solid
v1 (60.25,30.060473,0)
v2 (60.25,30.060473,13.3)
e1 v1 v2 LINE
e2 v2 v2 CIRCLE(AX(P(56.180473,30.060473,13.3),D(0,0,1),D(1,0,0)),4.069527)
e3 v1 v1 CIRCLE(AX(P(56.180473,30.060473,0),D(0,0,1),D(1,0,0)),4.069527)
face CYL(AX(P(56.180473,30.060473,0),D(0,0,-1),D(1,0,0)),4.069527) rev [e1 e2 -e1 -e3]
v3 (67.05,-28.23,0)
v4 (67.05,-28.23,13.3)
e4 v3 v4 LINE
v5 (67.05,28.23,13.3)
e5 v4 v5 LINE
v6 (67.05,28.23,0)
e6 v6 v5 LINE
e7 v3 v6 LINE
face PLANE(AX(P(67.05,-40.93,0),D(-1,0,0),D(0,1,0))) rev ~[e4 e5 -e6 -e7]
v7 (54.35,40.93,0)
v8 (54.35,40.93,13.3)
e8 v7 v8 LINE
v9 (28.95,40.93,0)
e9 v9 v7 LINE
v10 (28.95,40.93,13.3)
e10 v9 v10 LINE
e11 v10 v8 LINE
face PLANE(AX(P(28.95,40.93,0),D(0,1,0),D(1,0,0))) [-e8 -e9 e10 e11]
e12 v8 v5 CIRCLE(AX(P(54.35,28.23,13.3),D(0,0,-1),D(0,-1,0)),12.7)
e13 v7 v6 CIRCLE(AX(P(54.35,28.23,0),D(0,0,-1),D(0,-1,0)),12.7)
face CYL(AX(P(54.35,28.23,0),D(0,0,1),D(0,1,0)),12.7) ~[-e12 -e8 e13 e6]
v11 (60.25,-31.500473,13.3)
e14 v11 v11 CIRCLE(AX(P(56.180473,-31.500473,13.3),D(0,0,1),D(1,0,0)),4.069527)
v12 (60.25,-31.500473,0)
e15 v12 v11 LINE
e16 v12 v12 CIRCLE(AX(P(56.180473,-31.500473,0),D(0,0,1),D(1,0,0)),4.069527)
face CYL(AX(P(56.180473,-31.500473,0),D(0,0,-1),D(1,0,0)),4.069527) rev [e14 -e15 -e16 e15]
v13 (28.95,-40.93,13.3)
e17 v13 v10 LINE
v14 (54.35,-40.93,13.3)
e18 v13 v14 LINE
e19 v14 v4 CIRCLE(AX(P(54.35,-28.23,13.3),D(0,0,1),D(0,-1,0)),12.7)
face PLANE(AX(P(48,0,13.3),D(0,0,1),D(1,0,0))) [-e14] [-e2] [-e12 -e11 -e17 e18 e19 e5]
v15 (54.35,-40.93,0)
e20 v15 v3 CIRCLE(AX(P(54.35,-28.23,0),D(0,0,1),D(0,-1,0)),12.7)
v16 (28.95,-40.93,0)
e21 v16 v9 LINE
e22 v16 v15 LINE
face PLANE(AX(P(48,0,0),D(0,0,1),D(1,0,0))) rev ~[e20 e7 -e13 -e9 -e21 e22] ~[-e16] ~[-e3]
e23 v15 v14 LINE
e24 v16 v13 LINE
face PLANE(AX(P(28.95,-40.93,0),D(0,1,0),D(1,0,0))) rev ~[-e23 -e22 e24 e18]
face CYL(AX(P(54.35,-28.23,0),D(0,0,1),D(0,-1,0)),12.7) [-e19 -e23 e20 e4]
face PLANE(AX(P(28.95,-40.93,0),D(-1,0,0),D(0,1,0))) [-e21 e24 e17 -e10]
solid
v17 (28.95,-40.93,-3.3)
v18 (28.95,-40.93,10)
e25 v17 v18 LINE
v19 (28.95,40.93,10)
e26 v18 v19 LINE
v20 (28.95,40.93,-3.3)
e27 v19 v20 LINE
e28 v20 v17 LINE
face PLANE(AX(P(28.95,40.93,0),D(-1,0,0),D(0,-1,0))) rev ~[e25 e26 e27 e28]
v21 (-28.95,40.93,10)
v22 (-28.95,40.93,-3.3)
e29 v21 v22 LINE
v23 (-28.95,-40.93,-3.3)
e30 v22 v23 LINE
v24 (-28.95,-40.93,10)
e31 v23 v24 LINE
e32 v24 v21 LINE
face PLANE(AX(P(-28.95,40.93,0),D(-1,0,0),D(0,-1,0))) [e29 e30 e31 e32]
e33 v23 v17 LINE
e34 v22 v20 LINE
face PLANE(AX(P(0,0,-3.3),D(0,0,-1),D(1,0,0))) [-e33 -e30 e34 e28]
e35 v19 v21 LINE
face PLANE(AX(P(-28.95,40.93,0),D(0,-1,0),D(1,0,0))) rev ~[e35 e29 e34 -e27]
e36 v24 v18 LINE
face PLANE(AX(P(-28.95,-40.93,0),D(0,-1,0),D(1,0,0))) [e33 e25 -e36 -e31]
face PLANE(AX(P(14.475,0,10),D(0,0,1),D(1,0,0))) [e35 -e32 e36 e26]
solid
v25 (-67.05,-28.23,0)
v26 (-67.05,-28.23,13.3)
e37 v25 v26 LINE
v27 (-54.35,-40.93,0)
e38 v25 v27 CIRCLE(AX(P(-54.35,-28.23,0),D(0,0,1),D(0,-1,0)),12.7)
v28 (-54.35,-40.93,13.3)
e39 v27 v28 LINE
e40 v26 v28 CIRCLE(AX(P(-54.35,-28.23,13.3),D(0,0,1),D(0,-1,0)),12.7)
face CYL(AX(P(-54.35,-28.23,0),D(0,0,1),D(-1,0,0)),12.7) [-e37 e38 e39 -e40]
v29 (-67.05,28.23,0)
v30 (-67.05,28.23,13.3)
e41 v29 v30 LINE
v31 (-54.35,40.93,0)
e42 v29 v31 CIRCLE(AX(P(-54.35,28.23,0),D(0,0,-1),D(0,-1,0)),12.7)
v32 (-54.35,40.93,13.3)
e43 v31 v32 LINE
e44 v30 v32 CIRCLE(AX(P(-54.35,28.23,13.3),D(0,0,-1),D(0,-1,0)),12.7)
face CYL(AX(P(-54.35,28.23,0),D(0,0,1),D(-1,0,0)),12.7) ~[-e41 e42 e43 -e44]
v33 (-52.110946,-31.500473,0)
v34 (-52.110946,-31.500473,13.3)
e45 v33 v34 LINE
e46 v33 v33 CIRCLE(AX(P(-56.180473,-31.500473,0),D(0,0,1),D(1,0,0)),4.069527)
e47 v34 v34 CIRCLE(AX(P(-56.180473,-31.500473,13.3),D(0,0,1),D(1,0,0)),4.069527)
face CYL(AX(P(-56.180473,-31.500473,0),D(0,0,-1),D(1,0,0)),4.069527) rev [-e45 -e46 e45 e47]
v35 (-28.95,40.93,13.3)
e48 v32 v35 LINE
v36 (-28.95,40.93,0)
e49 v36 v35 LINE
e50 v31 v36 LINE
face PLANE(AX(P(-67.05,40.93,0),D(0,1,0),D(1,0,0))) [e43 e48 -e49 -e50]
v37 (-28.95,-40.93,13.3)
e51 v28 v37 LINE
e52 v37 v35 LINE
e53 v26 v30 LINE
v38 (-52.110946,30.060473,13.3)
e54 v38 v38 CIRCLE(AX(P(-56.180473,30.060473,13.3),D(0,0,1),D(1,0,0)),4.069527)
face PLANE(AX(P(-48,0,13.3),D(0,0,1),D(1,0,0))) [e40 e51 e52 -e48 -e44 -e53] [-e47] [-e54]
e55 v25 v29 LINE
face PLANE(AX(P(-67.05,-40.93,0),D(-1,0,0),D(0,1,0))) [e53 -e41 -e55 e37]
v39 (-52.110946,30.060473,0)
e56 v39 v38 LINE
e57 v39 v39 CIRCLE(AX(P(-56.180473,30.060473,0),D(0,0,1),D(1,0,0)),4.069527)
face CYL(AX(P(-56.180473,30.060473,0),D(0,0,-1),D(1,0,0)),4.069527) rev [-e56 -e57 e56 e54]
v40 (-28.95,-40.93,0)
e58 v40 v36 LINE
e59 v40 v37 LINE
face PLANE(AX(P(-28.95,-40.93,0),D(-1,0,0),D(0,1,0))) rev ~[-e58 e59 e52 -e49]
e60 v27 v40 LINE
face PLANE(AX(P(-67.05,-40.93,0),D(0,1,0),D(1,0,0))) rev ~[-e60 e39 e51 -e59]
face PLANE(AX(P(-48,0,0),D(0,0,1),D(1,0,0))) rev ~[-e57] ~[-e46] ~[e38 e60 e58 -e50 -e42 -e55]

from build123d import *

# Parameters (mm, degrees)
F0_W     = 38.1
F0_H     = 81.86
F0_R     = 4.0695268365
F1_DEPTH = 13.3
F0_W_2   = 28.95
F2_DEPTH = 10
F3_W     = 57.9
F3_H     = 81.86
F4_DEPTH = 3.3
F5_R     = 12.7
F5_2_R   = 12.7


with BuildPart() as f1:
    # F0 (on Top) → F1 (new body)
    with BuildSketch(Plane.XY):
        with Locations((-48, 0)):
            Rectangle(F0_W, F0_H)
        with Locations((-56.1804731635, -31.5004731635)):
            Circle(F0_R, mode=Mode.SUBTRACT)
        with Locations((-56.1804731635, 30.0604731635)):
            Circle(F0_R, mode=Mode.SUBTRACT)
    extrude(amount=F1_DEPTH)

    # F5
    f5_edges = [f1.edges().sort_by_distance(p)[0] for p in [
        (-67.05, 40.93, 6.65),
        (-67.05, -40.93, 6.65),
    ]]
    fillet(f5_edges, radius=F5_R)


with BuildPart() as f1b:
    # F0 (on Top) → F1, piece 2 (new body)
    with BuildSketch(Plane.XY):
        with Locations((48, 0)):
            Rectangle(F0_W, F0_H)
        with Locations((56.1804731635, -31.5004731635)):
            Circle(F0_R, mode=Mode.SUBTRACT)
        with Locations((56.1804731635, 30.0604731635)):
            Circle(F0_R, mode=Mode.SUBTRACT)
    extrude(amount=F1_DEPTH)

    # F5#2
    f5_2_edges = [f1b.edges().sort_by_distance(p)[0] for p in [
        (67.05, -40.93, 6.65),
        (67.05, 40.93, 6.65),
    ]]
    fillet(f5_2_edges, radius=F5_2_R)


with BuildPart() as f2:
    # F0 (on Top) → F2 (new body)
    with BuildSketch(Plane.XY):
        with Locations((14.475, 0)):
            Rectangle(F0_W_2, F0_H)
        with Locations((-14.475, 0)):
            Rectangle(F0_W_2, F0_H)
    extrude(amount=F2_DEPTH)

    # F3 (on face) → F4 (join)
    with BuildSketch(Plane(origin=(0, 0, 0), x_dir=(1, 0, 0), z_dir=(0, 0, -1))):
        Rectangle(F3_W, F3_H)
    extrude(amount=F4_DEPTH)


solid = Compound([f1.part, f1b.part, f2.part])
